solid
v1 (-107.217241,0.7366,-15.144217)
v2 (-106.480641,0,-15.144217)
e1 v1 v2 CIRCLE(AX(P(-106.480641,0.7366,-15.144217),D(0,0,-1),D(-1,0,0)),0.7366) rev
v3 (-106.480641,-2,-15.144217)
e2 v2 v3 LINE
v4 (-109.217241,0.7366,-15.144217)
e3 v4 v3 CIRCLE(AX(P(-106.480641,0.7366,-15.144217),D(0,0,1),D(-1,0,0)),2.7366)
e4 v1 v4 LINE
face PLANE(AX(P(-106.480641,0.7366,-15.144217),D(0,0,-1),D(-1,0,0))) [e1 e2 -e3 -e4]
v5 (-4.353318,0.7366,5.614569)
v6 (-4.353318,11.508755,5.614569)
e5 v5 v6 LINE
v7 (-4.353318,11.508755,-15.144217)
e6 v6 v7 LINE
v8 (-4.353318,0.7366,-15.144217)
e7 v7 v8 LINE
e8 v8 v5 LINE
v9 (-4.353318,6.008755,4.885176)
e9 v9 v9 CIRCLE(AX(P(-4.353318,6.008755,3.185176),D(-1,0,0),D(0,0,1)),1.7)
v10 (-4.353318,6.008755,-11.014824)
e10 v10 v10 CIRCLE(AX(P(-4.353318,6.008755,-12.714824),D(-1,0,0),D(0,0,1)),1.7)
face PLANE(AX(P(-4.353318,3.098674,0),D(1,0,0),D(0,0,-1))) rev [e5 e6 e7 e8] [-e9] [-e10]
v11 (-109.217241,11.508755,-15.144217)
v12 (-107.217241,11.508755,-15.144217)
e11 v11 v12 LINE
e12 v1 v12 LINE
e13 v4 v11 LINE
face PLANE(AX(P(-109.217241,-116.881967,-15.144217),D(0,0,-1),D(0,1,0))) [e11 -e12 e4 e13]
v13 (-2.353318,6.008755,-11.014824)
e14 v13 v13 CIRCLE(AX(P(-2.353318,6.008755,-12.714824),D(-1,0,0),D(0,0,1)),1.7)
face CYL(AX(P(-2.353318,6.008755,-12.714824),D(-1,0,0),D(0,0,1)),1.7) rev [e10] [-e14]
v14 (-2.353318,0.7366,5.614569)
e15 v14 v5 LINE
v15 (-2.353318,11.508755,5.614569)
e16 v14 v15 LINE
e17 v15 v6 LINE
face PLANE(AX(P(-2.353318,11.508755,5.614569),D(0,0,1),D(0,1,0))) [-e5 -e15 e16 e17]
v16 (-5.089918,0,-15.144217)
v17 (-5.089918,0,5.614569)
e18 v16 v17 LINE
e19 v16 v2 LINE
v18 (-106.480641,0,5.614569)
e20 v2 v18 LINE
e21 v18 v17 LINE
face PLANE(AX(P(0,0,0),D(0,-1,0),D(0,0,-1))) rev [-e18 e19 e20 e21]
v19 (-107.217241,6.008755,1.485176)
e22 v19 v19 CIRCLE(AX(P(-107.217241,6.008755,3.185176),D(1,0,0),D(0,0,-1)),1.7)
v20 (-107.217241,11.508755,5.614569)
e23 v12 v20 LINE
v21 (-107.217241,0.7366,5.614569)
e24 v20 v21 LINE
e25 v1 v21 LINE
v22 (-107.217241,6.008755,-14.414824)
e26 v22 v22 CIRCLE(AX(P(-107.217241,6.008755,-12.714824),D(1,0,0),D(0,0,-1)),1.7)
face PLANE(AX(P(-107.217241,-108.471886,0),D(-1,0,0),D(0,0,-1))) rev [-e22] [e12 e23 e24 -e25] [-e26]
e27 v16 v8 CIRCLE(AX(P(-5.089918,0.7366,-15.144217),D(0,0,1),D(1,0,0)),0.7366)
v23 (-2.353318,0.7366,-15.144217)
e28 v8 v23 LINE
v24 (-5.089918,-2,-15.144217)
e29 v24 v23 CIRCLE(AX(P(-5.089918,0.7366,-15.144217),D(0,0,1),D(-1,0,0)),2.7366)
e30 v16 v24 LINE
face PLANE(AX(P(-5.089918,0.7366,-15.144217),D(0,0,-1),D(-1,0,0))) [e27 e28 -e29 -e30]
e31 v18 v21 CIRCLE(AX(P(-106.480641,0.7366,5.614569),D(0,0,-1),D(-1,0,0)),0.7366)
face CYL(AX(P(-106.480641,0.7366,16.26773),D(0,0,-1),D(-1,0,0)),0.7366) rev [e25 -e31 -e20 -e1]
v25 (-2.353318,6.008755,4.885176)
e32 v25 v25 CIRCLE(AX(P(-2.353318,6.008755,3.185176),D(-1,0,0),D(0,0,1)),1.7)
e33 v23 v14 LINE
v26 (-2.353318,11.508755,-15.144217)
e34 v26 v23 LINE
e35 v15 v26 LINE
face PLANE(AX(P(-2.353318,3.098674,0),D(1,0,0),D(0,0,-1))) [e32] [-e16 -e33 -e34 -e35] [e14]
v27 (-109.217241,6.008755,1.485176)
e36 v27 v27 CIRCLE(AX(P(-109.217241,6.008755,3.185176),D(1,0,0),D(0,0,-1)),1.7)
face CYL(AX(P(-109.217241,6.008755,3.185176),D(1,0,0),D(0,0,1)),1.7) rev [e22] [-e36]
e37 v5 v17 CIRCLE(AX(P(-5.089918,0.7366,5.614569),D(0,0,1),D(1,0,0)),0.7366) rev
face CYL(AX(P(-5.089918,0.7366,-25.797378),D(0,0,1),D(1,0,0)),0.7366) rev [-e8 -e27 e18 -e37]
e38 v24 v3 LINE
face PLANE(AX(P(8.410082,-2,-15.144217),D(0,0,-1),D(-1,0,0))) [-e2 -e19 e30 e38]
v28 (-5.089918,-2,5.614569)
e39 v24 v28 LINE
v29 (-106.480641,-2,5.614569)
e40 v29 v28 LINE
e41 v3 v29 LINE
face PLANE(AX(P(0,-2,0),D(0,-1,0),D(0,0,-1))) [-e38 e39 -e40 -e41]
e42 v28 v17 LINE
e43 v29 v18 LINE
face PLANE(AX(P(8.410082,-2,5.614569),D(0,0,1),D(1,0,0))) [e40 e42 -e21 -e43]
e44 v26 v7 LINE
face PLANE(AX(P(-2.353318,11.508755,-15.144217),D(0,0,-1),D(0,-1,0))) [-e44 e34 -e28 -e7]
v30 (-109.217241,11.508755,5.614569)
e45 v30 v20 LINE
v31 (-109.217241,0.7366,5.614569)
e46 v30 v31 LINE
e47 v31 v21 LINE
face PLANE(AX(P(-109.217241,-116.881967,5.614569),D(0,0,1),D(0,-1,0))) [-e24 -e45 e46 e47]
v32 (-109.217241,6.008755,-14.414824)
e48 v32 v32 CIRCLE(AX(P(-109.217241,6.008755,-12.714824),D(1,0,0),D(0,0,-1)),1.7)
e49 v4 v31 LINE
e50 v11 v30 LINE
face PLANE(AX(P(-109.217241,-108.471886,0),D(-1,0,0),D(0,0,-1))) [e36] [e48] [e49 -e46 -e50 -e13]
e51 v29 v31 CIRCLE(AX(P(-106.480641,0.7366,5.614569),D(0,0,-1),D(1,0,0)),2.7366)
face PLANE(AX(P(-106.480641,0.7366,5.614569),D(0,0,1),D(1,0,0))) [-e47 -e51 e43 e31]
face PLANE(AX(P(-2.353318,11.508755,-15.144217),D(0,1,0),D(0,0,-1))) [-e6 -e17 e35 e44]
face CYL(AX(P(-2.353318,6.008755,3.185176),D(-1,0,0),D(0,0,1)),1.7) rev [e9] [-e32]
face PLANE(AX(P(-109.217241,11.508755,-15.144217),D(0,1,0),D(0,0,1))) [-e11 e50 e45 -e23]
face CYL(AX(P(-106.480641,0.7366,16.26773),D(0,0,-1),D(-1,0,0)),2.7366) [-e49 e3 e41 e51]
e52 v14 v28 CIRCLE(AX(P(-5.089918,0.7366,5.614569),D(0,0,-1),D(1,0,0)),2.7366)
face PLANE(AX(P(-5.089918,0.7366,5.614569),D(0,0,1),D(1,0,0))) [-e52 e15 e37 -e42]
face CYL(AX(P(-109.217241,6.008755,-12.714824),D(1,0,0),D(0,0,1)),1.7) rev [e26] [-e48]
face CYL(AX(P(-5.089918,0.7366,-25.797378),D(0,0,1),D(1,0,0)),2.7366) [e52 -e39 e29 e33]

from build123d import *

# Parameters (mm, degrees)
SKETCH_2_W             = 128.39072245
SKETCH_2_H             = 20.758785388
SKETCH_2_R             = 1.7
SM_BASE_FLANGE_1_DEPTH = 2
OTHER_START            = -15.144216699
OTHER_1_DEPTH          = 20.758785388
OTHER_START_2          = -11.014823905
OTHER_1_2_DEPTH        = 12.4999998
OTHER_1_3_DEPTH        = 0.729392594
OTHER_START_3          = 4.885176095
OTHER_1_4_DEPTH        = 0.729392594
OTHER_START_4          = -14.414824105
OTHER_1_5_DEPTH        = 19.3000002
OTHER_START_5          = -109.217240912
OTHER_1_6_OUTLINE_R    = 1.7
OTHER_1_6_DEPTH        = 106.86392245


with BuildPart() as part:
    # 基体-法兰1: sheet metal written as solids
    # Sketch 2 → 基体-法兰1 (new body)
    with BuildSketch(Plane(origin=(0, 0, 0), x_dir=(1, 0, 0), z_dir=(0, 1, 0))):
        with Locations((-55.785279687, 4.764824005)):
            Rectangle(SKETCH_2_W, SKETCH_2_H)
        with Locations(Location((2.910081538, 12.714824005, 0), (0, 0, 270))):
            Circle(SKETCH_2_R, mode=Mode.SUBTRACT)
        with Locations(Location((2.910081538, -3.185175995, 0), (0, 0, 270))):
            Circle(SKETCH_2_R, mode=Mode.SUBTRACT)
        with Locations(Location((-114.480640912, -3.185175995, 0), (0, 0, 90))):
            Circle(SKETCH_2_R, mode=Mode.SUBTRACT)
        with Locations(Location((-114.480640912, 12.714824005, 0), (0, 0, 90))):
            Circle(SKETCH_2_R, mode=Mode.SUBTRACT)
    extrude(amount=-SM_BASE_FLANGE_1_DEPTH)

    # Other 1: read off the stored shape, not the designer's step
    # Other 1 outline → Other 1 (cut)
    with BuildSketch(Plane.XY.offset(OTHER_START)):
        with BuildLine():
            Line((-119.980640912, -2), (-106.480640912, -2))
            ThreePointArc((-106.480640912, -2), (-108.134908121, -1.443395312), (-109.11624331, 0))
            Line((-109.11624331, 0), (-119.980640912, 0))
            Line((-119.980640912, 0), (-119.980640912, -2))
        make_face()
        with BuildLine():
            ThreePointArc((-2.454316064, 0), (-3.435651253, -1.443395312), (-5.089918462, -2))
            Line((-5.089918462, -2), (8.410081538, -2))
            Line((8.410081538, -2), (8.410081538, 0))
            Line((8.410081538, 0), (-2.454316064, 0))
        make_face()
    extrude(amount=OTHER_1_DEPTH, mode=Mode.SUBTRACT)

    # Other 1 2 outline → Other 1 2 (add)
    with BuildSketch(Plane.XY.offset(OTHER_START_2)):
        with BuildLine():
            ThreePointArc((-109.217240912, 0.7366), (-109.191873941, 0.364854094), (-109.11624331, 0))
            Line((-109.11624331, 0), (-106.480640912, 0))
            ThreePointArc((-106.480640912, 0), (-107.001495767, 0.215745145), (-107.217240912, 0.7366))
            Line((-107.217240912, 0.7366), (-107.217240912, 11.508755099))
            Line((-107.217240912, 11.508755099), (-109.217240912, 11.508755099))
            Line((-109.217240912, 11.508755099), (-109.217240912, 0.7366))
        make_face()
        with BuildLine():
            Line((-5.089918462, 0), (-2.454316064, 0))
            ThreePointArc((-2.454316064, 0), (-2.378685433, 0.364854094), (-2.353318462, 0.7366))
            Line((-2.353318462, 0.7366), (-2.353318462, 11.508755099))
            Line((-2.353318462, 11.508755099), (-4.353318462, 11.508755099))
            Line((-4.353318462, 11.508755099), (-4.353318462, 0.7366))
            ThreePointArc((-4.353318462, 0.7366), (-4.569063607, 0.215745145), (-5.089918462, 0))
        make_face()
    extrude(amount=OTHER_1_2_DEPTH)

    # Other 1 3 outline → Other 1 3 (add)
    with BuildSketch(Plane.XY.offset(OTHER_START)):
        with BuildLine():
            ThreePointArc((-109.217240912, 0.7366), (-109.191873941, 0.364854094), (-109.11624331, 0))
            Line((-109.11624331, 0), (-106.480640912, 0))
            ThreePointArc((-106.480640912, 0), (-107.001495767, 0.215745145), (-107.217240912, 0.7366))
            Line((-107.217240912, 0.7366), (-107.217240912, 11.508755099))
            Line((-107.217240912, 11.508755099), (-109.217240912, 11.508755099))
            Line((-109.217240912, 11.508755099), (-109.217240912, 0.7366))
        make_face()
        with BuildLine():
            Line((-5.089918462, 0), (-2.454316064, 0))
            ThreePointArc((-2.454316064, 0), (-2.378685433, 0.364854094), (-2.353318462, 0.7366))
            Line((-2.353318462, 0.7366), (-2.353318462, 11.508755099))
            Line((-2.353318462, 11.508755099), (-4.353318462, 11.508755099))
            Line((-4.353318462, 11.508755099), (-4.353318462, 0.7366))
            ThreePointArc((-4.353318462, 0.7366), (-4.569063607, 0.215745145), (-5.089918462, 0))
        make_face()
    extrude(amount=OTHER_1_3_DEPTH)

    # Other 1 4 outline → Other 1 4 (add)
    with BuildSketch(Plane.XY.offset(OTHER_START_3)):
        with BuildLine():
            ThreePointArc((-109.217240912, 0.7366), (-109.191873941, 0.364854094), (-109.11624331, 0))
            Line((-109.11624331, 0), (-106.480640912, 0))
            ThreePointArc((-106.480640912, 0), (-107.001495767, 0.215745145), (-107.217240912, 0.7366))
            Line((-107.217240912, 0.7366), (-107.217240912, 11.508755099))
            Line((-107.217240912, 11.508755099), (-109.217240912, 11.508755099))
            Line((-109.217240912, 11.508755099), (-109.217240912, 0.7366))
        make_face()
        with BuildLine():
            Line((-5.089918462, 0), (-2.454316064, 0))
            ThreePointArc((-2.454316064, 0), (-2.378685433, 0.364854094), (-2.353318462, 0.7366))
            Line((-2.353318462, 0.7366), (-2.353318462, 11.508755099))
            Line((-2.353318462, 11.508755099), (-4.353318462, 11.508755099))
            Line((-4.353318462, 11.508755099), (-4.353318462, 0.7366))
            ThreePointArc((-4.353318462, 0.7366), (-4.569063607, 0.215745145), (-5.089918462, 0))
        make_face()
    extrude(amount=OTHER_1_4_DEPTH)

    # Other 1 5 outline → Other 1 5 (add)
    with BuildSketch(Plane.XY.offset(OTHER_START_4)):
        with BuildLine():
            ThreePointArc((-4.353318462, 0.7366), (-4.569063607, 0.215745145), (-5.089918462, 0))
            Line((-5.089918462, 0), (-2.454316064, 0))
            ThreePointArc((-2.454316064, 0), (-2.378685433, 0.364854094), (-2.353318462, 0.7366))
            Line((-2.353318462, 0.7366), (-2.353318462, 11.508755099))
            Line((-2.353318462, 11.508755099), (-4.353318462, 11.508755099))
            Line((-4.353318462, 11.508755099), (-4.353318462, 0.7366))
        make_face()
        with BuildLine():
            ThreePointArc((-109.217240912, 0.7366), (-109.191873941, 0.364854094), (-109.11624331, 0))
            Line((-109.11624331, 0), (-106.480640912, 0))
            ThreePointArc((-106.480640912, 0), (-107.001495767, 0.215745145), (-107.217240912, 0.7366))
            Line((-107.217240912, 0.7366), (-107.217240912, 11.508755099))
            Line((-107.217240912, 11.508755099), (-109.217240912, 11.508755099))
            Line((-109.217240912, 11.508755099), (-109.217240912, 0.7366))
        make_face()
    extrude(amount=OTHER_1_5_DEPTH)

    # Other 1 6 outline → Other 1 6 (cut)
    with BuildSketch(Plane.YZ.offset(OTHER_START_5)):
        with Locations((6.008755099, -12.714824005)):
            Circle(OTHER_1_6_OUTLINE_R)
        with Locations((6.008755099, 3.185175995)):
            Circle(OTHER_1_6_OUTLINE_R)
    extrude(amount=OTHER_1_6_DEPTH, mode=Mode.SUBTRACT)


solid = part.part
